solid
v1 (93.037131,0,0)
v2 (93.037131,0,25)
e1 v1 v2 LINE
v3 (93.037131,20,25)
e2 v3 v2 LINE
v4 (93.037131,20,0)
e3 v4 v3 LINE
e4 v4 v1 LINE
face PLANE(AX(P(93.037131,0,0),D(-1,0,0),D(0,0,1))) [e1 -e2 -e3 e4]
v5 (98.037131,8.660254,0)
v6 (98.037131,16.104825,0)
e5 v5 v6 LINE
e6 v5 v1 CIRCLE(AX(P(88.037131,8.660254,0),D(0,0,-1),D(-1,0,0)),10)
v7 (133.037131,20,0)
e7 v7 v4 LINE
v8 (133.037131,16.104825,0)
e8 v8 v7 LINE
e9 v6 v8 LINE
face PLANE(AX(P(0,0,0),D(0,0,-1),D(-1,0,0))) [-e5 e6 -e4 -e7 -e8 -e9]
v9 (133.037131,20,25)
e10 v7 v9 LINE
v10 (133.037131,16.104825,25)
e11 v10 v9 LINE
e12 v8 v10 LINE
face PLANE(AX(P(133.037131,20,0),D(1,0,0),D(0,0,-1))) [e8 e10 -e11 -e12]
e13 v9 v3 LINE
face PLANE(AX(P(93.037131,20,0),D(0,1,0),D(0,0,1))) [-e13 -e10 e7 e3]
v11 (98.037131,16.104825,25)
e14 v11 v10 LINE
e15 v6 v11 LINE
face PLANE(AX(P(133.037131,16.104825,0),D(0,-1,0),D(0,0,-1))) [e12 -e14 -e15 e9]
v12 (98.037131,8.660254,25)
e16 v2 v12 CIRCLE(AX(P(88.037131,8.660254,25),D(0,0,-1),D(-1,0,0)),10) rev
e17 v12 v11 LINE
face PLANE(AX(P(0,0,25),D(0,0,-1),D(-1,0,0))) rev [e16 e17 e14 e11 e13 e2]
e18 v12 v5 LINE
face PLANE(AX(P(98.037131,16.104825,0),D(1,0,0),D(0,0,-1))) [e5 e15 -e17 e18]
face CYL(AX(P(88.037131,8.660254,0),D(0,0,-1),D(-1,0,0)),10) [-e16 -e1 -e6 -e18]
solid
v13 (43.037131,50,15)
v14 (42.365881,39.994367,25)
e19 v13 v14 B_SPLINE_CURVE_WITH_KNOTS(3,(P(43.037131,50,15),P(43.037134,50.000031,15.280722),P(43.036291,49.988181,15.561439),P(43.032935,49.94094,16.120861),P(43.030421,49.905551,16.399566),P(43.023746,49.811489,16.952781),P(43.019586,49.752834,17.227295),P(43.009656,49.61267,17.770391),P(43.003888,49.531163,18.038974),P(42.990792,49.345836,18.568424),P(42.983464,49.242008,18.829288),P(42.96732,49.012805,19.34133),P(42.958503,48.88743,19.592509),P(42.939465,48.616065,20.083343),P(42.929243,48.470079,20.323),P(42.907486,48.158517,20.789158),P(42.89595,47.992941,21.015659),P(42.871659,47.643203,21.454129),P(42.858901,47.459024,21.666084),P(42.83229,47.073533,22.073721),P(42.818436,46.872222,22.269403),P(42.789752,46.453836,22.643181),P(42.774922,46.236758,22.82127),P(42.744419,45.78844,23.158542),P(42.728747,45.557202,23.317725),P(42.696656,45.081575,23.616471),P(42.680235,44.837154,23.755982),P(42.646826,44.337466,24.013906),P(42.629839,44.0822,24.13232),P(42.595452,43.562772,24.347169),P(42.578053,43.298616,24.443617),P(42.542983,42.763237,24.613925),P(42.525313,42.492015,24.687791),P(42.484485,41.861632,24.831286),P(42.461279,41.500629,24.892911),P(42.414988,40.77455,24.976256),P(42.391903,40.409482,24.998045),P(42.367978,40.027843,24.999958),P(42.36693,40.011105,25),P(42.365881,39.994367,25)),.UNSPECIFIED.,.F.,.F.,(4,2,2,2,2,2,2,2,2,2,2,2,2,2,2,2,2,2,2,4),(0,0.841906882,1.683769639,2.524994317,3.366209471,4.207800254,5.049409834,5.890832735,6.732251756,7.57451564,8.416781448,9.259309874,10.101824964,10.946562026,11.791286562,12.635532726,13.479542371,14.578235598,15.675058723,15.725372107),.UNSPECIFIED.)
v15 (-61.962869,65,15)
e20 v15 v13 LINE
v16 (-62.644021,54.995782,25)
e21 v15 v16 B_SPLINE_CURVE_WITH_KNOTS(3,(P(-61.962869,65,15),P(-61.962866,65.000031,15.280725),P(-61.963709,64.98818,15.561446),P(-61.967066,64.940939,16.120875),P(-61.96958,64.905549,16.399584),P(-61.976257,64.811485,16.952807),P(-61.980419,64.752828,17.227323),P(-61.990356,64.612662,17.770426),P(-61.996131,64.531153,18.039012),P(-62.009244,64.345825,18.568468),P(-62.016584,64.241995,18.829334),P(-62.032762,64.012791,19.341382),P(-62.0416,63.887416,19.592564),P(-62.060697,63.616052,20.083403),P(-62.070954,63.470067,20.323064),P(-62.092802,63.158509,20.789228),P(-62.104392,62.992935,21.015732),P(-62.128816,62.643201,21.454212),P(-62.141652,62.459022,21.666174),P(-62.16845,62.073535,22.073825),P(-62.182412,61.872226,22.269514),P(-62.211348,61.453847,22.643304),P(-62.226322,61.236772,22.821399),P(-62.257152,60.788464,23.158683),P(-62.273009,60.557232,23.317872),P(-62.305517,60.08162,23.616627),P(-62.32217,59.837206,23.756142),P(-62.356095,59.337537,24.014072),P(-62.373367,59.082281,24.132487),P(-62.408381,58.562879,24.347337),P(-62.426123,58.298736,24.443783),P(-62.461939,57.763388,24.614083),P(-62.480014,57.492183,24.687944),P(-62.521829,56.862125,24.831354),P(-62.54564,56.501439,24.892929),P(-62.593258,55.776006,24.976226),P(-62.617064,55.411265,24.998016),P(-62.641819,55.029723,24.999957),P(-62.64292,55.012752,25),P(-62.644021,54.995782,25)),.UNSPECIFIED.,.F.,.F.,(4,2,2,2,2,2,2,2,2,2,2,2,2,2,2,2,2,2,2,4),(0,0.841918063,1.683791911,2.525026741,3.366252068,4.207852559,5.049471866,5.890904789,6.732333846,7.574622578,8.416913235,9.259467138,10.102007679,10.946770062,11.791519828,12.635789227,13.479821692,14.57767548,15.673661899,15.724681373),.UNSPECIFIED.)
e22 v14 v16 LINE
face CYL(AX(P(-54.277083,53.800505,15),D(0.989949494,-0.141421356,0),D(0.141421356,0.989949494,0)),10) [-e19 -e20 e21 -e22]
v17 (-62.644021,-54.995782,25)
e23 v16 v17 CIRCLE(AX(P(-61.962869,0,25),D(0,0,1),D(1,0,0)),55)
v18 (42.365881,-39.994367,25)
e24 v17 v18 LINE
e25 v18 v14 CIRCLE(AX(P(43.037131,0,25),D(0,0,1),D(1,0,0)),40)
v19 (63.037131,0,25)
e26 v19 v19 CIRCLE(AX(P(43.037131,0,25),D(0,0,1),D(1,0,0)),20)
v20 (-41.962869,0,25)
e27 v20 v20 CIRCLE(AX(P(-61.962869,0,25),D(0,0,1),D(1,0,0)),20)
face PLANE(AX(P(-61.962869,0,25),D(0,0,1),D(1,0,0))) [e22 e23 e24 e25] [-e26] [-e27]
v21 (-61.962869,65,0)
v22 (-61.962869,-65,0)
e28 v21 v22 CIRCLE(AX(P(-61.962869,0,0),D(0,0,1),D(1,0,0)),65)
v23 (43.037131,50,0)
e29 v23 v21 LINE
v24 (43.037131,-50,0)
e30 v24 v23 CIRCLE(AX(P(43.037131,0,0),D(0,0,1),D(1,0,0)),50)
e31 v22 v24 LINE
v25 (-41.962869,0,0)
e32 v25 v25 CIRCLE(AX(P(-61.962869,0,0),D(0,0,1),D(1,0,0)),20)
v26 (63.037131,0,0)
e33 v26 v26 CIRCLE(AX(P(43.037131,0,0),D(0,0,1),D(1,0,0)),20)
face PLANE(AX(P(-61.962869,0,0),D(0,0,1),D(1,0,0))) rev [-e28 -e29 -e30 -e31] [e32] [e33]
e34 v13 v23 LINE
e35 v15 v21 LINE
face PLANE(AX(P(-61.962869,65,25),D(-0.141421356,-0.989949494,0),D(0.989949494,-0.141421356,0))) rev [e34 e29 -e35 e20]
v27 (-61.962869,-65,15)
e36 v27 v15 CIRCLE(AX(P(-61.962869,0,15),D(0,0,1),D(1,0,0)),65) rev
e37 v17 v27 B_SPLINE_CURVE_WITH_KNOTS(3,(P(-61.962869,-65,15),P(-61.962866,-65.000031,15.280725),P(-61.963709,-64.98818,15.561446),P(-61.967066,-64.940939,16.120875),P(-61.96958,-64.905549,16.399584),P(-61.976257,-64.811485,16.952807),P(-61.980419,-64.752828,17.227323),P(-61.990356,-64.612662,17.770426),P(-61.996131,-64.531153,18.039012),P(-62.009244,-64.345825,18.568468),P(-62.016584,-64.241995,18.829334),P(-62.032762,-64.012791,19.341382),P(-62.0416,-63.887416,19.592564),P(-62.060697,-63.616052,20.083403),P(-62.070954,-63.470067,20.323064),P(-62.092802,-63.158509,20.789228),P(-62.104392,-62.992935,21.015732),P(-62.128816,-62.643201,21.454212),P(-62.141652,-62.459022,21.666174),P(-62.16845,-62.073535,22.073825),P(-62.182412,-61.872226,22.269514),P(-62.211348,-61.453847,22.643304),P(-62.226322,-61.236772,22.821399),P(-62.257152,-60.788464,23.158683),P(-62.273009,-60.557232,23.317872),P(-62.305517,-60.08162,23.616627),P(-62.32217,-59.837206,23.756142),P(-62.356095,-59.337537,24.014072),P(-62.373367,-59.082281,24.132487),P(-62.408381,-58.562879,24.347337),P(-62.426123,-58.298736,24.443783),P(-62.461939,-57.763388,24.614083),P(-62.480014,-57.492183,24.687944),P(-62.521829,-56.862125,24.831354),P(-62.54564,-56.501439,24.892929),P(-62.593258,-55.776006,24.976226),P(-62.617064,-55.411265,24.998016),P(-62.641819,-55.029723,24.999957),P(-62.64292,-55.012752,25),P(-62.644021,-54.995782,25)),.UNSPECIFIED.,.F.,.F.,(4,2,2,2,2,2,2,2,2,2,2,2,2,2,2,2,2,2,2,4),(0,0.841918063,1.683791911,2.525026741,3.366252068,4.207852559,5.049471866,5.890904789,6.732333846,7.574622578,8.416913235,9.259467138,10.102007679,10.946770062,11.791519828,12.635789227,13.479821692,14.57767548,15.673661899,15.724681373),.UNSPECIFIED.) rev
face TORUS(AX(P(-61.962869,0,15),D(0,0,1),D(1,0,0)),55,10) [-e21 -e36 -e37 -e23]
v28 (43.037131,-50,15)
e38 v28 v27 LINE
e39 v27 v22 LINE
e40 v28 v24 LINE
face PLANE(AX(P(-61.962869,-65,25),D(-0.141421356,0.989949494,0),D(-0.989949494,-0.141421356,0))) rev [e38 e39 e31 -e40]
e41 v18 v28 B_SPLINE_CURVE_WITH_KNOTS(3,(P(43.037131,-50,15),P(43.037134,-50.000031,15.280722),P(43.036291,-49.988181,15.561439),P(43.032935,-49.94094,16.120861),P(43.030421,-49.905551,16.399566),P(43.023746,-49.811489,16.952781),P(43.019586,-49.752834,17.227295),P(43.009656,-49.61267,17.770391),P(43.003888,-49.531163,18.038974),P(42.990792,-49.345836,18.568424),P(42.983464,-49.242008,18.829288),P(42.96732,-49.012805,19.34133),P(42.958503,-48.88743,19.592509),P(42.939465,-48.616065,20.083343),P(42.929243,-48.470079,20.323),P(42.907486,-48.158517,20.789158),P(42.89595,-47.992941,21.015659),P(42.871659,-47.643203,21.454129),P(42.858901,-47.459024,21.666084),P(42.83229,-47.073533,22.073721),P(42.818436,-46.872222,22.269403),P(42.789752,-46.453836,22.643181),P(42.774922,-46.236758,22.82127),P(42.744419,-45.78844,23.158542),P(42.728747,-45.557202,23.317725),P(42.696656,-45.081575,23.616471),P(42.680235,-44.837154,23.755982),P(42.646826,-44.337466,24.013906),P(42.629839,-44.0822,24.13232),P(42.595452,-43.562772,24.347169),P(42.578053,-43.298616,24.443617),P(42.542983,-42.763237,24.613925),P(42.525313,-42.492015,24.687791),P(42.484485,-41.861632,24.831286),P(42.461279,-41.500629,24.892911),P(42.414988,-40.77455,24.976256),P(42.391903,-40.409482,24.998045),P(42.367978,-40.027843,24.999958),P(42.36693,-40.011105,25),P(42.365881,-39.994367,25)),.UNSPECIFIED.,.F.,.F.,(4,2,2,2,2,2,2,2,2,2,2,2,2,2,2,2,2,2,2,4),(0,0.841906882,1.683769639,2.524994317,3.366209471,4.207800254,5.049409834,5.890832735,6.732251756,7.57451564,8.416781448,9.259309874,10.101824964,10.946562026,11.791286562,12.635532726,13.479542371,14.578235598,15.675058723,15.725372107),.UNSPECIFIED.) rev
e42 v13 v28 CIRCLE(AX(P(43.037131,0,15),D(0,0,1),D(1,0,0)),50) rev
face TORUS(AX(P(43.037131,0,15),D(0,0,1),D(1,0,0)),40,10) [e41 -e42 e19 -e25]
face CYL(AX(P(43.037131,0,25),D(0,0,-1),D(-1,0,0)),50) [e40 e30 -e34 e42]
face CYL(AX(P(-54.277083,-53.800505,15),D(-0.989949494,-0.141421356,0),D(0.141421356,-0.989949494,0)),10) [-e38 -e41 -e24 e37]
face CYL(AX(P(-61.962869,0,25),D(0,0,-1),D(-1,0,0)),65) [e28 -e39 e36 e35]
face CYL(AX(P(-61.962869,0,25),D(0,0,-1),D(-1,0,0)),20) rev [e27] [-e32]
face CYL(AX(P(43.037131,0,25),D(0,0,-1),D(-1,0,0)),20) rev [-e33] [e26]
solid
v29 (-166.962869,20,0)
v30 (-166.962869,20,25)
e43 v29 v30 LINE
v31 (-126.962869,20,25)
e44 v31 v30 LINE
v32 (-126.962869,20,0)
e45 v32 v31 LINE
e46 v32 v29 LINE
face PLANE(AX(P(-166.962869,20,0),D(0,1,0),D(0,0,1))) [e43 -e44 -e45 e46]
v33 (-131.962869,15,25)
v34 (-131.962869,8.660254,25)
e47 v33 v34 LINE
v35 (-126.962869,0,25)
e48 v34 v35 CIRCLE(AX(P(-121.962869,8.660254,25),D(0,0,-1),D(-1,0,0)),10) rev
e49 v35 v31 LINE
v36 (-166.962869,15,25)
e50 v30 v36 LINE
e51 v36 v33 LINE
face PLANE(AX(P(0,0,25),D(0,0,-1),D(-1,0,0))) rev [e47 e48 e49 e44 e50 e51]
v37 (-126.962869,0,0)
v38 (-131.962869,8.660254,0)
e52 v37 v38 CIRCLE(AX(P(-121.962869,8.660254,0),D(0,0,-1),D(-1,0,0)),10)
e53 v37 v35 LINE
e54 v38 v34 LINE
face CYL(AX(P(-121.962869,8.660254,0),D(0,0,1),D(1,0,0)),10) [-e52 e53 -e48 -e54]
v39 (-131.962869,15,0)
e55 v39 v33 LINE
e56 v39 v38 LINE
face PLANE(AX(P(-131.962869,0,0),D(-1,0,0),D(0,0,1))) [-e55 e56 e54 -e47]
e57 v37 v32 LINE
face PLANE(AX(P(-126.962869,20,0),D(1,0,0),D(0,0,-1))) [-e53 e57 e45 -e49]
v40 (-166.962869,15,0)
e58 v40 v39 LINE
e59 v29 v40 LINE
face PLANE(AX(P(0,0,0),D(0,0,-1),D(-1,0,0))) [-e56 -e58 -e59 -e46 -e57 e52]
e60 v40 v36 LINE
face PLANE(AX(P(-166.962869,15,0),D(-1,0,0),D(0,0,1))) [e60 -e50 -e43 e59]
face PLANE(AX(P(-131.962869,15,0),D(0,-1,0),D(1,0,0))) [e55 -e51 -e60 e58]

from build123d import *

# Parameters (mm, degrees)
SKETCH1_R           = 20
BOSS_EXTRUDE1_DEPTH = 25
FILLET1_R           = 10
BOSS_EXTRUDE2_DEPTH = 25
FILLET2_R           = 10
BOSS_EXTRUDE3_DEPTH = 25
FILLET3_R           = 10


with BuildPart() as part:
    # Sketch1 → Boss-Extrude1 (new body)
    with BuildSketch(Plane.XY):
        with BuildLine():
            Line((-61.96286897, 65), (43.03713103, 50))
            ThreePointArc((43.03713103, 50), (93.03713103, 0), (43.03713103, -50))
            Line((43.03713103, -50), (-61.96286897, -65))
            ThreePointArc((-61.96286897, -65), (-126.96286897, 0), (-61.96286897, 65))
        make_face()
        with Locations((43.03713103, 0)):
            Circle(SKETCH1_R, mode=Mode.SUBTRACT)
        with Locations((-61.96286897, 0)):
            Circle(SKETCH1_R, mode=Mode.SUBTRACT)
    extrude(amount=BOSS_EXTRUDE1_DEPTH)

    # Fillet1
    fillet1_edges = [part.edges().sort_by_distance(p)[0] for p in [
        (93.03713103, 0, 25),
        (-9.46286897, 57.5, 25),
        (-126.96286897, 0, 25),
        (-9.46286897, -57.5, 25),
    ]]
    fillet(fillet1_edges, radius=FILLET1_R)


with BuildPart() as body_2:
    # Sketch3 → Boss-Extrude2 (new body)
    with BuildSketch(Plane.XY.offset(25)):
        Polygon((93.03713103, 0), (93.03713103, 20), (133.03713103, 20), (133.03713103, 16.104825027), (98.03713103, 16.104825027), (98.03713103, 0), align=None)
    extrude(amount=-BOSS_EXTRUDE2_DEPTH)

    # Fillet2
    # the kernel refuses this fillet: 10 mm, written as the material it takes off along each edge
    with BuildSketch(Plane(origin=(98.03713103, 0, 46.650635095), x_dir=(0, 1, 0), z_dir=(0, 0, -1))) as fillet2_piece_1:
        with BuildLine():
            CenterArc((8.660254038, -10), FILLET2_R, 90, 60)
            Line((0, -5), (-0.173205081, -4.9))
            ThreePointArc((-0.173205081, -4.9), (-0.2, -2.5), (-0.2, 0))
            Line((-0.2, 0), (0, 0.2))
            Line((0, 0.2), (8.660254038, 0.2))
            Line((8.660254038, 0.2), (8.660254038, 0))
        make_face()
    extrude(amount=68.301270189, mode=Mode.SUBTRACT)


with BuildPart() as body_3:
    # Sketch4 → Boss-Extrude3 (new body)
    with BuildSketch(Plane.XY.offset(25)):
        Polygon((-126.96286897, 0), (-131.96286897, 0), (-131.96286897, 15), (-166.96286897, 15), (-166.96286897, 20), (-126.96286897, 20), align=None)
    extrude(amount=-BOSS_EXTRUDE3_DEPTH)

    # Fillet3
    # the kernel refuses this fillet: 10 mm, written as the material it takes off along each edge
    with BuildSketch(Plane(origin=(-131.96286897, 0, 46.650635095), x_dir=(1, 0, 0), z_dir=(0, 0, -1))) as fillet3_piece_1:
        with BuildLine():
            CenterArc((10, -8.660254038), FILLET3_R, 120, 60)
            Line((0, -8.660254038), (-0.2, -8.660254038))
            Line((-0.2, -8.660254038), (-0.2, 0))
            Line((-0.2, 0), (0, 0.2))
            ThreePointArc((0, 0.2), (2.5, 0.2), (4.9, 0.173205081))
            Line((4.9, 0.173205081), (5, 0))
        make_face()
    extrude(amount=68.301270189, mode=Mode.SUBTRACT)


solid = Compound([part.part, body_2.part, body_3.part])
